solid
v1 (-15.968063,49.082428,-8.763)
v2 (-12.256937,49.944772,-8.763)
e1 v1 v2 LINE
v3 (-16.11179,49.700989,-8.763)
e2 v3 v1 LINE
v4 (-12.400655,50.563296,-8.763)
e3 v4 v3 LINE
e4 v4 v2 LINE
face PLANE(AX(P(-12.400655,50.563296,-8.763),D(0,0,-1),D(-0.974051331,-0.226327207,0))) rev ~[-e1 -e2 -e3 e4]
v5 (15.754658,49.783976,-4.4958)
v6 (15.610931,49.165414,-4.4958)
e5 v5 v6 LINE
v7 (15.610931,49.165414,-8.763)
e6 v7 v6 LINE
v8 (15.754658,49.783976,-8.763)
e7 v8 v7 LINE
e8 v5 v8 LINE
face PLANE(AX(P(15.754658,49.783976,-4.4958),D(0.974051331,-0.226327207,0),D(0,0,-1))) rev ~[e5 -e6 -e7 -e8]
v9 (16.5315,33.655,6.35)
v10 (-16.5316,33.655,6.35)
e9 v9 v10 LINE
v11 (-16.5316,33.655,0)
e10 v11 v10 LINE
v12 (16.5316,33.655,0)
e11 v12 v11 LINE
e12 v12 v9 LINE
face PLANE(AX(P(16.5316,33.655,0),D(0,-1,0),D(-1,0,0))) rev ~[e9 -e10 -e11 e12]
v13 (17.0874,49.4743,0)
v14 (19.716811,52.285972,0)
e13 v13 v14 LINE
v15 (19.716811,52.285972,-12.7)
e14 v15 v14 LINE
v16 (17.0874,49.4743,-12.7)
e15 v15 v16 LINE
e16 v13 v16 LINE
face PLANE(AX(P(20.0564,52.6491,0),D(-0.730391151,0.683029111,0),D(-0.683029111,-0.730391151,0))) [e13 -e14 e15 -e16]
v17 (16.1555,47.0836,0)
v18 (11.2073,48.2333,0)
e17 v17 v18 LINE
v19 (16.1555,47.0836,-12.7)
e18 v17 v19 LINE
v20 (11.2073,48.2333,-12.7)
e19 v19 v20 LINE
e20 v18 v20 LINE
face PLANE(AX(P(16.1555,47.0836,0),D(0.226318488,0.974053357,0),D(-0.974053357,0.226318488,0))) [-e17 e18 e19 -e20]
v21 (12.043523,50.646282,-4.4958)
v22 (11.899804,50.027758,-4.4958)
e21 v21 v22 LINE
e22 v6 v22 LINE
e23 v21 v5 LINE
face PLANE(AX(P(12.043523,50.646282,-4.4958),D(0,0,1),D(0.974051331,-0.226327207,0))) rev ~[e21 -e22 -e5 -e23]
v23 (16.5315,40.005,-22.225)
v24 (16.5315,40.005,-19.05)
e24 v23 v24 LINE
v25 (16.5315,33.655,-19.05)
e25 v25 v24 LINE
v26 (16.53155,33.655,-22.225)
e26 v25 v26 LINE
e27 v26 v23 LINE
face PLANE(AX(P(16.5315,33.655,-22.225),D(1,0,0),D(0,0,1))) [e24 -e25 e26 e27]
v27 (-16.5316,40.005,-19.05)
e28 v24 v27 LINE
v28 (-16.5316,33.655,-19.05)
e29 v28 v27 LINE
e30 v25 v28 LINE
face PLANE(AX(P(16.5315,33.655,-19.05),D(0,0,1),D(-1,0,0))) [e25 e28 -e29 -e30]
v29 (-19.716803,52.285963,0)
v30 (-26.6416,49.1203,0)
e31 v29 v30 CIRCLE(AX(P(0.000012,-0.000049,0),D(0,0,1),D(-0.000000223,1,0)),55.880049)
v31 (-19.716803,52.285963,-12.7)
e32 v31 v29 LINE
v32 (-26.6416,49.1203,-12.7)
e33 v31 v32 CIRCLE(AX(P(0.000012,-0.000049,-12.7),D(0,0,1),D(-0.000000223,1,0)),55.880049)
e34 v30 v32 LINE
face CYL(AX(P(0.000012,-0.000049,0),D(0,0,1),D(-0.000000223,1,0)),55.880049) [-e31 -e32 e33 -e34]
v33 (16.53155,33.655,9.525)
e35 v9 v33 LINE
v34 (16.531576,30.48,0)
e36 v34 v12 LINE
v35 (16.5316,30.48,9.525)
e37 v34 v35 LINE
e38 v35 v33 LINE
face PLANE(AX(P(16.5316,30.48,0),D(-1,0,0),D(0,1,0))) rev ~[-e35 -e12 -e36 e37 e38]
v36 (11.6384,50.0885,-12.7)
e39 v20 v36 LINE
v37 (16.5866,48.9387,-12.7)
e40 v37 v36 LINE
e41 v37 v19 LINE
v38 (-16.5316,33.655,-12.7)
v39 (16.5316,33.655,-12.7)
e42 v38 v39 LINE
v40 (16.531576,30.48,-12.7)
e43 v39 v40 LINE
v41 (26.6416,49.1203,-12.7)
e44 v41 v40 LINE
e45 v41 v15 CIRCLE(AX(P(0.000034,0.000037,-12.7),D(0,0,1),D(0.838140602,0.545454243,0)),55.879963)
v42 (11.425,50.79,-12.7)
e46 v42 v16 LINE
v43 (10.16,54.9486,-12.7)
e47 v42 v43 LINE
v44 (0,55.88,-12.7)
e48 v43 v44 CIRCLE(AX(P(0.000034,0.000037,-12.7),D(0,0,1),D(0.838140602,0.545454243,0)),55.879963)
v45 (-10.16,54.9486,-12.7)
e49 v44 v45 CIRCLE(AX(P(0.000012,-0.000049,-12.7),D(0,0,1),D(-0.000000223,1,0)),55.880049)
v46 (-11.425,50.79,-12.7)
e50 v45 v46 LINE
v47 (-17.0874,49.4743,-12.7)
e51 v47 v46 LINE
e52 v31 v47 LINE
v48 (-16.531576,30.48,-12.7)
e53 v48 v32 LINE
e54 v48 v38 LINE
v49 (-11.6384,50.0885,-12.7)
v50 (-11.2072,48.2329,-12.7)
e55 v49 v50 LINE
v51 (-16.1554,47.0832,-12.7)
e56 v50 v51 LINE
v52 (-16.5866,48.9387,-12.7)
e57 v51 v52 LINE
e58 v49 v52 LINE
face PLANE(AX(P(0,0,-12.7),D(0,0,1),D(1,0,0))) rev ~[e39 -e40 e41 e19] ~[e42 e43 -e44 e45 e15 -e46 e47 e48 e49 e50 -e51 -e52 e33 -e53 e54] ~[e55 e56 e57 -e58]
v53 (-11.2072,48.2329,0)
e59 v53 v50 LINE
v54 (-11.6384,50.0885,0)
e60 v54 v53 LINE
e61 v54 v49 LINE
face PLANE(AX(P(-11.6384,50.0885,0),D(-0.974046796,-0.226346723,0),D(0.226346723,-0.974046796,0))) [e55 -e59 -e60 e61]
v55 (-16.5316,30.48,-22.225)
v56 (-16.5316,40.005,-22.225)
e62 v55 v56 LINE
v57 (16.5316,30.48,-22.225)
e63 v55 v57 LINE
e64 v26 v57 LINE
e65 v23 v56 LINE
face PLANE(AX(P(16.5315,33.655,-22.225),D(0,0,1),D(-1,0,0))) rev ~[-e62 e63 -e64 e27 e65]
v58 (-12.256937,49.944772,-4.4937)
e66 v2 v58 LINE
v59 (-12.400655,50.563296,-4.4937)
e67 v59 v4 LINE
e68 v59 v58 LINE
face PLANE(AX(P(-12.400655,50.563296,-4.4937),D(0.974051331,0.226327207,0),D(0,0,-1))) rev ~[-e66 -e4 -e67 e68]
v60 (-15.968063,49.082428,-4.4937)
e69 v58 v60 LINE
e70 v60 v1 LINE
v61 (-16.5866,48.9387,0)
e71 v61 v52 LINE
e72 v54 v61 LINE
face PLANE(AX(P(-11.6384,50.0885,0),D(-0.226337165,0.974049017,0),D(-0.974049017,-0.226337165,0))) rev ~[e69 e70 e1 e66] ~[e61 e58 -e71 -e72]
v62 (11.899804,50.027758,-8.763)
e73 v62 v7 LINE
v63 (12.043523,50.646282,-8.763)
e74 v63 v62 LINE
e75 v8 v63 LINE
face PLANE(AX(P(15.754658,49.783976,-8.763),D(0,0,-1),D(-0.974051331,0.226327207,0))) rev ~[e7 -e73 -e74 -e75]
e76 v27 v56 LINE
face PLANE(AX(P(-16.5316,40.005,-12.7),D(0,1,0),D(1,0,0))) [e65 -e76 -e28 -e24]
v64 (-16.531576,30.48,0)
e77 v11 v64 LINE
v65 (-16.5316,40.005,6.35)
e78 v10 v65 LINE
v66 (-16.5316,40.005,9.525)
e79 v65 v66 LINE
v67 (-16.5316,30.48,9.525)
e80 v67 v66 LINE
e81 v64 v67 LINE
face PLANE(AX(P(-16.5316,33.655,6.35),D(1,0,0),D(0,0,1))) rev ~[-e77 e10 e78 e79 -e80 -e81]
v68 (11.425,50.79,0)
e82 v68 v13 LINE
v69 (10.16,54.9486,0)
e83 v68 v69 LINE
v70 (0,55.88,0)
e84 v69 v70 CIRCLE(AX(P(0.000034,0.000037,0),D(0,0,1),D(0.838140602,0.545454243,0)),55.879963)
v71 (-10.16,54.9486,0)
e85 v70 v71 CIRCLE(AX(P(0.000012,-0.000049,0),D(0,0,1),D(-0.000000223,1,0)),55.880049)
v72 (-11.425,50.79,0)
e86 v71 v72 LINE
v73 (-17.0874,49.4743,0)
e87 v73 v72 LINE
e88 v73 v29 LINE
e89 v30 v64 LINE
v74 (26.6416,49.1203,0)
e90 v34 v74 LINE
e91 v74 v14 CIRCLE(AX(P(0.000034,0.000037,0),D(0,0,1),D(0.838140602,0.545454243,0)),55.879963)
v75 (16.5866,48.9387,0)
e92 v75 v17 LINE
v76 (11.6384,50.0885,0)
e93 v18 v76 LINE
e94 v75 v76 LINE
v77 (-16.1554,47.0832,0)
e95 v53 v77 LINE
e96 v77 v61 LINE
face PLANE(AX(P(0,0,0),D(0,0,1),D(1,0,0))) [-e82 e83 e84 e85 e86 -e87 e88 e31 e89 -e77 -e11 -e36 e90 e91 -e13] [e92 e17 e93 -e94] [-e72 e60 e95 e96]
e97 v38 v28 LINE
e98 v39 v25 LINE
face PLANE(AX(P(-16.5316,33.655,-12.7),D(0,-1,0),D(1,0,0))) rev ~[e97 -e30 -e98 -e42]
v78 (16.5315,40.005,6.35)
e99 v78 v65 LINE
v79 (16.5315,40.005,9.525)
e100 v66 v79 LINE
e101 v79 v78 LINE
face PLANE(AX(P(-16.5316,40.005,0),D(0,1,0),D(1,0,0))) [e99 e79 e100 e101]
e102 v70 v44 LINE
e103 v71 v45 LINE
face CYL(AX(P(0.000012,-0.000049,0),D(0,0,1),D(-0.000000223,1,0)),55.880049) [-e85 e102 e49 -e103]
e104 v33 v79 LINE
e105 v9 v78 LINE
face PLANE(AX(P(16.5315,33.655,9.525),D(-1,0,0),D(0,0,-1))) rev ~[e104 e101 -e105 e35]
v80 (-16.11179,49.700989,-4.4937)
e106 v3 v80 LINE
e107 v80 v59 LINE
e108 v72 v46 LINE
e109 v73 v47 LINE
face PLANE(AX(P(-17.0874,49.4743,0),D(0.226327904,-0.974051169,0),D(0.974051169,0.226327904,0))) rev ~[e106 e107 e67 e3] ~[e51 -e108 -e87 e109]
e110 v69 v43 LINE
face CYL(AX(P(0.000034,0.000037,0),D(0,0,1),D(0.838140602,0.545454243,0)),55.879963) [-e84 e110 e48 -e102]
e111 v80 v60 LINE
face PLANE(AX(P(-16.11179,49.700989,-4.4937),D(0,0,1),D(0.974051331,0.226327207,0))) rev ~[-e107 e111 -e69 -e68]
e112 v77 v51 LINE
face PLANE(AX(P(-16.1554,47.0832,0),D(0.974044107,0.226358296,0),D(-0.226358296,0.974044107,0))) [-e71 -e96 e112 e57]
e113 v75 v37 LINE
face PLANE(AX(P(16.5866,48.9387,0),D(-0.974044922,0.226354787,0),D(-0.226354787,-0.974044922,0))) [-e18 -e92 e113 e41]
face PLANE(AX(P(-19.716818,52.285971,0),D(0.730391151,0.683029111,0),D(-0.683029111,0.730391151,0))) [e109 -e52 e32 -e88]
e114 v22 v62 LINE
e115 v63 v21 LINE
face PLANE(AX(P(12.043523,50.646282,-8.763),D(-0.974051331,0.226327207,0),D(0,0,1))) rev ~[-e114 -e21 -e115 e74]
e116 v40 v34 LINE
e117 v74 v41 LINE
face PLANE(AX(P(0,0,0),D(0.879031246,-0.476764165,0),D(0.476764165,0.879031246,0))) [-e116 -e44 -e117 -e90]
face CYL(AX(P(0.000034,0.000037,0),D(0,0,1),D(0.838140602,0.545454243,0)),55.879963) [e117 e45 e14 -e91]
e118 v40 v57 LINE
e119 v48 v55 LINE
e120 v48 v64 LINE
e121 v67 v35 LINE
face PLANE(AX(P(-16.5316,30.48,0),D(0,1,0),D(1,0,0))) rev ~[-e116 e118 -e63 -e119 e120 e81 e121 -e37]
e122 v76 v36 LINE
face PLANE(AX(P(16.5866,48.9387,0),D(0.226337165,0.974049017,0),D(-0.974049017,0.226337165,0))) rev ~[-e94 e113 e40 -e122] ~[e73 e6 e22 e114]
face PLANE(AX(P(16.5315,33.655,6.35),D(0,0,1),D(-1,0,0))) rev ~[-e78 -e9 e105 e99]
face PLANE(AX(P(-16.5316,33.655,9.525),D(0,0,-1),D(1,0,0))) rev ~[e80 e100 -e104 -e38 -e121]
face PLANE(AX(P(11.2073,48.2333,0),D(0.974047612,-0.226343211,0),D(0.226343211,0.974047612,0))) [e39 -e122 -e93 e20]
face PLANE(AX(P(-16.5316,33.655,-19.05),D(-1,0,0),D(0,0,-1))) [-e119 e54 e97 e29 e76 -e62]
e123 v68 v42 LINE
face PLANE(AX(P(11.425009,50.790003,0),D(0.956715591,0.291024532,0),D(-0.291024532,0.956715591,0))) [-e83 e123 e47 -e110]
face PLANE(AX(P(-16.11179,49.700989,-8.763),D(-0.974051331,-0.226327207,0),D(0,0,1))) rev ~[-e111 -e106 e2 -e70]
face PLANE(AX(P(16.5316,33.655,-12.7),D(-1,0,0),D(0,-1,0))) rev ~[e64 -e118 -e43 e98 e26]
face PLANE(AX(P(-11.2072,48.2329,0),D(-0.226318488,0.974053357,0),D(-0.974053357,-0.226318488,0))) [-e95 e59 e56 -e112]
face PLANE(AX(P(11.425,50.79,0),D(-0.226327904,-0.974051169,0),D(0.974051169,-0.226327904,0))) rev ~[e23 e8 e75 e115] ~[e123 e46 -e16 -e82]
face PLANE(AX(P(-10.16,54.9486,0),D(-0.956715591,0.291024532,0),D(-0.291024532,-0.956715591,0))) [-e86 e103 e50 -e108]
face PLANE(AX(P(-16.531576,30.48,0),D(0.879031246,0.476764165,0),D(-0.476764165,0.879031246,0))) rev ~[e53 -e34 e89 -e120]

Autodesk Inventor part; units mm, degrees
ref_plane "YZ Plane" through (0, 0, 0) normal (1, 0, 0) x (0, 1, 0)
ref_plane "XZ Plane" through (0, 0, 0) normal (0, 1, 0) x (-1, 0, 0)
ref_plane "XY Plane" through (0, 0, 0) normal (0, 0, 1) x (1, 0, 0)
sketch "Sketch1" plane through (0, 0, 0) normal (0, 0, 1) x (1, 0, 0)
  line L0 (-46.8353, 30.48) -> (46.8353, 30.48)
  arc A0 (0, 55.88) -> (-46.8353, 30.48) centre (0, 0) ccw
  arc A1 (46.8353, 30.48) -> (0, 55.88) centre (0, 0) ccw
extrude "Extrusion1" add sketch "Sketch1" against normal blind 12.7
sketch "Sketch2" plane through (0, 0, 0) normal (0, 0, 1) x (1, 0, 0)
  line L0 (-46.8353, 30.48) -> (46.8353, 30.48) projected
  arc A0 (46.8353, 30.48) -> (-46.8353, 30.48) centre (0, 0) ccw projected
  line L1 (0, 55.88) -> (0, 0)
  line L2 (0, 0) -> (46.8353, 30.48)
  line L3 (-46.8353, 30.48) -> (0, 0)
  line L4 (0, 0) -> (-26.6416, 49.1203)
  line L5 (0, 0) -> (26.6416, 49.1203)
  line L6 (-16.5866, 48.9387) -> (-20.0564, 52.6491)
  line L7 (-20.0564, 52.6491) -> (-18.578, 57.5092)
  line L8 (-18.578, 57.5092) -> (-13.6298, 58.659)
  line L9 (-13.6298, 58.659) -> (-10.16, 54.9486)
  line L10 (-10.16, 54.9486) -> (-11.6384, 50.0885)
  line L11 (-11.6384, 50.0885) -> (-16.5866, 48.9387)
  line L12 (16.5866, 48.9387) -> (11.6384, 50.0885)
  line L13 (11.6384, 50.0885) -> (10.16, 54.9486)
  line L14 (10.16, 54.9486) -> (13.6298, 58.659)
  line L15 (13.6298, 58.659) -> (18.578, 57.5092)
  line L16 (18.578, 57.5092) -> (20.0564, 52.6491)
  line L17 (20.0564, 52.6491) -> (16.5866, 48.9387)
  line L18 (11.6384, 50.0885) -> (16.5866, 48.9387)
  line L19 (16.5866, 48.9387) -> (16.1555, 47.0836)
  line L20 (16.1555, 47.0836) -> (11.2073, 48.2333)
  line L21 (11.2073, 48.2333) -> (11.6384, 50.0885)
  line L22 (-16.5866, 48.9387) -> (-11.6384, 50.0885)
  line L23 (-11.6384, 50.0885) -> (-11.2072, 48.2329)
  line L24 (-11.2072, 48.2329) -> (-16.1554, 47.0832)
  line L25 (-16.1554, 47.0832) -> (-16.5866, 48.9387)
  line L26 (-17.0874, 49.4743) -> (-11.425, 50.79)
  line L27 (11.425, 50.79) -> (17.0874, 49.4743)
  point P0 (-15.1082, 53.7989)
  point P1 (15.1082, 53.7989)
  dimension "d8" = 28.47
  dimension "d9" = 28.47
  dimension "d18" = 5.08
  dimension "d19" = 5.08
  dimension "d20" = 10.16
  dimension "d21" = 10.16
  dimension "d22" = 1.905
  dimension "d23" = 1.9046
  dimension "d24" = 0.635
  dimension "d25" = 0.635
extrude "Extrusion2" cut sketch "Sketch2" against normal blind 12.7 contours A0 L4 L0 | L0 L4 L3 | L5 L0 L2 | L6 L7 L8 L9 A0 | A0 L10 L26 L6 | L0 L5 A0 | L14 L15 L16 L17 A0 | A0 L17 L27 L13 | L11 L23 L24 L25 | L12 L19 L20 L21
sketch "Sketch3" plane through (-17.0874, 49.4743, 0) normal (-0.2263272, 0.9740513, 0) x (0.9740513, 0.2263272, 0)
  line L0 (0, 0) -> (0, 12.7) projected
  line L1 (1.0016, 8.763) -> (1.0016, 4.4937)
  line L2 (1.0016, 4.4937) -> (4.8116, 4.4937)
  line L3 (4.8116, 4.4937) -> (4.8116, 8.763)
  line L4 (4.8116, 8.763) -> (1.0016, 8.763)
  point P0 (5.8132, 12.7)
  point P1 (5.4466, 0)
  dimension "d28" = 0.635
  dimension "d29" = 3.81
  dimension "d30" = 3.937
extrude "Extrusion3" cut sketch "Sketch3" against normal up to next
sketch "Sketch4" plane through (11.425, 50.79, 0) normal (0.2263272, 0.9740513, 0) x (0.9740513, -0.2263272, 0)
  line L0 (0, 0) -> (0, 12.7) projected
  line L1 (0.635, 8.763) -> (0.635, 4.4958)
  line L2 (0.635, 4.4958) -> (4.445, 4.4958)
  line L3 (4.445, 4.4958) -> (4.445, 8.763)
  line L4 (4.445, 8.763) -> (0.635, 8.763)
  point P0 (0.3666, 0)
  dimension "d33" = 3.81
  dimension "d34" = 3.937
  dimension "d35" = 0.635
  dimension "d36" = 4.2672
extrude "Extrusion4" cut sketch "Sketch4" against normal up to next
sketch "Sketch5" plane through (0, 0, -12.7) normal (0, 0, -1) x (-1, 0, 0)
  line L0 (16.5316, 30.48) -> (-16.5316, 30.48) projected
  line L1 (-16.5316, 30.48) -> (16.5316, 30.48)
  line L2 (16.5316, 30.48) -> (16.5316, 33.655)
  line L3 (16.5316, 33.655) -> (-16.5316, 33.655)
  line L4 (-16.5316, 33.655) -> (-16.5316, 30.48)
  dimension "d39" = 3.175
extrude "Extrusion5" add sketch "Sketch5" along normal blind 9.525
sketch "Sketch7" plane through (-16.5316, 33.655, -12.7) normal (0, 1, 0) x (1, 0, 0)
  line L0 (33.0631, 9.525) -> (0, 9.525) projected
  line L1 (0, 9.525) -> (33.0631, 9.525)
  line L2 (33.0631, 9.525) -> (33.0631, 6.35)
  line L3 (33.0631, 6.35) -> (0, 6.35)
  line L4 (0, 6.35) -> (0, 9.525)
  point P0 (16.5316, -12.7)
  dimension "d42" = 3.175
extrude "Extrusion6" add sketch "Sketch7" along normal blind 6.35
sketch "Sketch8" plane through (0, 0, 0) normal (0, 0, 1) x (1, 0, 0)
  line L0 (-16.5316, 30.48) -> (16.5316, 30.48) projected
  line L1 (-16.5316, 30.48) -> (16.5316, 30.48)
  line L2 (16.5316, 30.48) -> (16.5316, 33.655)
  line L3 (16.5316, 33.655) -> (-16.5316, 33.655)
  line L4 (-16.5316, 33.655) -> (-16.5316, 30.48)
  dimension "d45" = 3.175
extrude "Extrusion7" add sketch "Sketch8" along normal blind 9.525
sketch "Sketch9" plane through (-16.5316, 33.655, 0) normal (0, 1, 0) x (1, 0, 0)
  line L0 (0, -9.525) -> (33.0631, -9.525) projected
  line L1 (0, -9.525) -> (33.0631, -9.525)
  line L2 (33.0631, -9.525) -> (33.0631, -6.35)
  line L3 (33.0631, -6.35) -> (0, -6.35)
  line L4 (0, -6.35) -> (0, -9.525)
  point P0 (16.5316, 0)
  dimension "d48" = 3.175
extrude "Extrusion8" add sketch "Sketch9" along normal blind 6.35
properties part number "IR Sensor Piece Ver 2"
